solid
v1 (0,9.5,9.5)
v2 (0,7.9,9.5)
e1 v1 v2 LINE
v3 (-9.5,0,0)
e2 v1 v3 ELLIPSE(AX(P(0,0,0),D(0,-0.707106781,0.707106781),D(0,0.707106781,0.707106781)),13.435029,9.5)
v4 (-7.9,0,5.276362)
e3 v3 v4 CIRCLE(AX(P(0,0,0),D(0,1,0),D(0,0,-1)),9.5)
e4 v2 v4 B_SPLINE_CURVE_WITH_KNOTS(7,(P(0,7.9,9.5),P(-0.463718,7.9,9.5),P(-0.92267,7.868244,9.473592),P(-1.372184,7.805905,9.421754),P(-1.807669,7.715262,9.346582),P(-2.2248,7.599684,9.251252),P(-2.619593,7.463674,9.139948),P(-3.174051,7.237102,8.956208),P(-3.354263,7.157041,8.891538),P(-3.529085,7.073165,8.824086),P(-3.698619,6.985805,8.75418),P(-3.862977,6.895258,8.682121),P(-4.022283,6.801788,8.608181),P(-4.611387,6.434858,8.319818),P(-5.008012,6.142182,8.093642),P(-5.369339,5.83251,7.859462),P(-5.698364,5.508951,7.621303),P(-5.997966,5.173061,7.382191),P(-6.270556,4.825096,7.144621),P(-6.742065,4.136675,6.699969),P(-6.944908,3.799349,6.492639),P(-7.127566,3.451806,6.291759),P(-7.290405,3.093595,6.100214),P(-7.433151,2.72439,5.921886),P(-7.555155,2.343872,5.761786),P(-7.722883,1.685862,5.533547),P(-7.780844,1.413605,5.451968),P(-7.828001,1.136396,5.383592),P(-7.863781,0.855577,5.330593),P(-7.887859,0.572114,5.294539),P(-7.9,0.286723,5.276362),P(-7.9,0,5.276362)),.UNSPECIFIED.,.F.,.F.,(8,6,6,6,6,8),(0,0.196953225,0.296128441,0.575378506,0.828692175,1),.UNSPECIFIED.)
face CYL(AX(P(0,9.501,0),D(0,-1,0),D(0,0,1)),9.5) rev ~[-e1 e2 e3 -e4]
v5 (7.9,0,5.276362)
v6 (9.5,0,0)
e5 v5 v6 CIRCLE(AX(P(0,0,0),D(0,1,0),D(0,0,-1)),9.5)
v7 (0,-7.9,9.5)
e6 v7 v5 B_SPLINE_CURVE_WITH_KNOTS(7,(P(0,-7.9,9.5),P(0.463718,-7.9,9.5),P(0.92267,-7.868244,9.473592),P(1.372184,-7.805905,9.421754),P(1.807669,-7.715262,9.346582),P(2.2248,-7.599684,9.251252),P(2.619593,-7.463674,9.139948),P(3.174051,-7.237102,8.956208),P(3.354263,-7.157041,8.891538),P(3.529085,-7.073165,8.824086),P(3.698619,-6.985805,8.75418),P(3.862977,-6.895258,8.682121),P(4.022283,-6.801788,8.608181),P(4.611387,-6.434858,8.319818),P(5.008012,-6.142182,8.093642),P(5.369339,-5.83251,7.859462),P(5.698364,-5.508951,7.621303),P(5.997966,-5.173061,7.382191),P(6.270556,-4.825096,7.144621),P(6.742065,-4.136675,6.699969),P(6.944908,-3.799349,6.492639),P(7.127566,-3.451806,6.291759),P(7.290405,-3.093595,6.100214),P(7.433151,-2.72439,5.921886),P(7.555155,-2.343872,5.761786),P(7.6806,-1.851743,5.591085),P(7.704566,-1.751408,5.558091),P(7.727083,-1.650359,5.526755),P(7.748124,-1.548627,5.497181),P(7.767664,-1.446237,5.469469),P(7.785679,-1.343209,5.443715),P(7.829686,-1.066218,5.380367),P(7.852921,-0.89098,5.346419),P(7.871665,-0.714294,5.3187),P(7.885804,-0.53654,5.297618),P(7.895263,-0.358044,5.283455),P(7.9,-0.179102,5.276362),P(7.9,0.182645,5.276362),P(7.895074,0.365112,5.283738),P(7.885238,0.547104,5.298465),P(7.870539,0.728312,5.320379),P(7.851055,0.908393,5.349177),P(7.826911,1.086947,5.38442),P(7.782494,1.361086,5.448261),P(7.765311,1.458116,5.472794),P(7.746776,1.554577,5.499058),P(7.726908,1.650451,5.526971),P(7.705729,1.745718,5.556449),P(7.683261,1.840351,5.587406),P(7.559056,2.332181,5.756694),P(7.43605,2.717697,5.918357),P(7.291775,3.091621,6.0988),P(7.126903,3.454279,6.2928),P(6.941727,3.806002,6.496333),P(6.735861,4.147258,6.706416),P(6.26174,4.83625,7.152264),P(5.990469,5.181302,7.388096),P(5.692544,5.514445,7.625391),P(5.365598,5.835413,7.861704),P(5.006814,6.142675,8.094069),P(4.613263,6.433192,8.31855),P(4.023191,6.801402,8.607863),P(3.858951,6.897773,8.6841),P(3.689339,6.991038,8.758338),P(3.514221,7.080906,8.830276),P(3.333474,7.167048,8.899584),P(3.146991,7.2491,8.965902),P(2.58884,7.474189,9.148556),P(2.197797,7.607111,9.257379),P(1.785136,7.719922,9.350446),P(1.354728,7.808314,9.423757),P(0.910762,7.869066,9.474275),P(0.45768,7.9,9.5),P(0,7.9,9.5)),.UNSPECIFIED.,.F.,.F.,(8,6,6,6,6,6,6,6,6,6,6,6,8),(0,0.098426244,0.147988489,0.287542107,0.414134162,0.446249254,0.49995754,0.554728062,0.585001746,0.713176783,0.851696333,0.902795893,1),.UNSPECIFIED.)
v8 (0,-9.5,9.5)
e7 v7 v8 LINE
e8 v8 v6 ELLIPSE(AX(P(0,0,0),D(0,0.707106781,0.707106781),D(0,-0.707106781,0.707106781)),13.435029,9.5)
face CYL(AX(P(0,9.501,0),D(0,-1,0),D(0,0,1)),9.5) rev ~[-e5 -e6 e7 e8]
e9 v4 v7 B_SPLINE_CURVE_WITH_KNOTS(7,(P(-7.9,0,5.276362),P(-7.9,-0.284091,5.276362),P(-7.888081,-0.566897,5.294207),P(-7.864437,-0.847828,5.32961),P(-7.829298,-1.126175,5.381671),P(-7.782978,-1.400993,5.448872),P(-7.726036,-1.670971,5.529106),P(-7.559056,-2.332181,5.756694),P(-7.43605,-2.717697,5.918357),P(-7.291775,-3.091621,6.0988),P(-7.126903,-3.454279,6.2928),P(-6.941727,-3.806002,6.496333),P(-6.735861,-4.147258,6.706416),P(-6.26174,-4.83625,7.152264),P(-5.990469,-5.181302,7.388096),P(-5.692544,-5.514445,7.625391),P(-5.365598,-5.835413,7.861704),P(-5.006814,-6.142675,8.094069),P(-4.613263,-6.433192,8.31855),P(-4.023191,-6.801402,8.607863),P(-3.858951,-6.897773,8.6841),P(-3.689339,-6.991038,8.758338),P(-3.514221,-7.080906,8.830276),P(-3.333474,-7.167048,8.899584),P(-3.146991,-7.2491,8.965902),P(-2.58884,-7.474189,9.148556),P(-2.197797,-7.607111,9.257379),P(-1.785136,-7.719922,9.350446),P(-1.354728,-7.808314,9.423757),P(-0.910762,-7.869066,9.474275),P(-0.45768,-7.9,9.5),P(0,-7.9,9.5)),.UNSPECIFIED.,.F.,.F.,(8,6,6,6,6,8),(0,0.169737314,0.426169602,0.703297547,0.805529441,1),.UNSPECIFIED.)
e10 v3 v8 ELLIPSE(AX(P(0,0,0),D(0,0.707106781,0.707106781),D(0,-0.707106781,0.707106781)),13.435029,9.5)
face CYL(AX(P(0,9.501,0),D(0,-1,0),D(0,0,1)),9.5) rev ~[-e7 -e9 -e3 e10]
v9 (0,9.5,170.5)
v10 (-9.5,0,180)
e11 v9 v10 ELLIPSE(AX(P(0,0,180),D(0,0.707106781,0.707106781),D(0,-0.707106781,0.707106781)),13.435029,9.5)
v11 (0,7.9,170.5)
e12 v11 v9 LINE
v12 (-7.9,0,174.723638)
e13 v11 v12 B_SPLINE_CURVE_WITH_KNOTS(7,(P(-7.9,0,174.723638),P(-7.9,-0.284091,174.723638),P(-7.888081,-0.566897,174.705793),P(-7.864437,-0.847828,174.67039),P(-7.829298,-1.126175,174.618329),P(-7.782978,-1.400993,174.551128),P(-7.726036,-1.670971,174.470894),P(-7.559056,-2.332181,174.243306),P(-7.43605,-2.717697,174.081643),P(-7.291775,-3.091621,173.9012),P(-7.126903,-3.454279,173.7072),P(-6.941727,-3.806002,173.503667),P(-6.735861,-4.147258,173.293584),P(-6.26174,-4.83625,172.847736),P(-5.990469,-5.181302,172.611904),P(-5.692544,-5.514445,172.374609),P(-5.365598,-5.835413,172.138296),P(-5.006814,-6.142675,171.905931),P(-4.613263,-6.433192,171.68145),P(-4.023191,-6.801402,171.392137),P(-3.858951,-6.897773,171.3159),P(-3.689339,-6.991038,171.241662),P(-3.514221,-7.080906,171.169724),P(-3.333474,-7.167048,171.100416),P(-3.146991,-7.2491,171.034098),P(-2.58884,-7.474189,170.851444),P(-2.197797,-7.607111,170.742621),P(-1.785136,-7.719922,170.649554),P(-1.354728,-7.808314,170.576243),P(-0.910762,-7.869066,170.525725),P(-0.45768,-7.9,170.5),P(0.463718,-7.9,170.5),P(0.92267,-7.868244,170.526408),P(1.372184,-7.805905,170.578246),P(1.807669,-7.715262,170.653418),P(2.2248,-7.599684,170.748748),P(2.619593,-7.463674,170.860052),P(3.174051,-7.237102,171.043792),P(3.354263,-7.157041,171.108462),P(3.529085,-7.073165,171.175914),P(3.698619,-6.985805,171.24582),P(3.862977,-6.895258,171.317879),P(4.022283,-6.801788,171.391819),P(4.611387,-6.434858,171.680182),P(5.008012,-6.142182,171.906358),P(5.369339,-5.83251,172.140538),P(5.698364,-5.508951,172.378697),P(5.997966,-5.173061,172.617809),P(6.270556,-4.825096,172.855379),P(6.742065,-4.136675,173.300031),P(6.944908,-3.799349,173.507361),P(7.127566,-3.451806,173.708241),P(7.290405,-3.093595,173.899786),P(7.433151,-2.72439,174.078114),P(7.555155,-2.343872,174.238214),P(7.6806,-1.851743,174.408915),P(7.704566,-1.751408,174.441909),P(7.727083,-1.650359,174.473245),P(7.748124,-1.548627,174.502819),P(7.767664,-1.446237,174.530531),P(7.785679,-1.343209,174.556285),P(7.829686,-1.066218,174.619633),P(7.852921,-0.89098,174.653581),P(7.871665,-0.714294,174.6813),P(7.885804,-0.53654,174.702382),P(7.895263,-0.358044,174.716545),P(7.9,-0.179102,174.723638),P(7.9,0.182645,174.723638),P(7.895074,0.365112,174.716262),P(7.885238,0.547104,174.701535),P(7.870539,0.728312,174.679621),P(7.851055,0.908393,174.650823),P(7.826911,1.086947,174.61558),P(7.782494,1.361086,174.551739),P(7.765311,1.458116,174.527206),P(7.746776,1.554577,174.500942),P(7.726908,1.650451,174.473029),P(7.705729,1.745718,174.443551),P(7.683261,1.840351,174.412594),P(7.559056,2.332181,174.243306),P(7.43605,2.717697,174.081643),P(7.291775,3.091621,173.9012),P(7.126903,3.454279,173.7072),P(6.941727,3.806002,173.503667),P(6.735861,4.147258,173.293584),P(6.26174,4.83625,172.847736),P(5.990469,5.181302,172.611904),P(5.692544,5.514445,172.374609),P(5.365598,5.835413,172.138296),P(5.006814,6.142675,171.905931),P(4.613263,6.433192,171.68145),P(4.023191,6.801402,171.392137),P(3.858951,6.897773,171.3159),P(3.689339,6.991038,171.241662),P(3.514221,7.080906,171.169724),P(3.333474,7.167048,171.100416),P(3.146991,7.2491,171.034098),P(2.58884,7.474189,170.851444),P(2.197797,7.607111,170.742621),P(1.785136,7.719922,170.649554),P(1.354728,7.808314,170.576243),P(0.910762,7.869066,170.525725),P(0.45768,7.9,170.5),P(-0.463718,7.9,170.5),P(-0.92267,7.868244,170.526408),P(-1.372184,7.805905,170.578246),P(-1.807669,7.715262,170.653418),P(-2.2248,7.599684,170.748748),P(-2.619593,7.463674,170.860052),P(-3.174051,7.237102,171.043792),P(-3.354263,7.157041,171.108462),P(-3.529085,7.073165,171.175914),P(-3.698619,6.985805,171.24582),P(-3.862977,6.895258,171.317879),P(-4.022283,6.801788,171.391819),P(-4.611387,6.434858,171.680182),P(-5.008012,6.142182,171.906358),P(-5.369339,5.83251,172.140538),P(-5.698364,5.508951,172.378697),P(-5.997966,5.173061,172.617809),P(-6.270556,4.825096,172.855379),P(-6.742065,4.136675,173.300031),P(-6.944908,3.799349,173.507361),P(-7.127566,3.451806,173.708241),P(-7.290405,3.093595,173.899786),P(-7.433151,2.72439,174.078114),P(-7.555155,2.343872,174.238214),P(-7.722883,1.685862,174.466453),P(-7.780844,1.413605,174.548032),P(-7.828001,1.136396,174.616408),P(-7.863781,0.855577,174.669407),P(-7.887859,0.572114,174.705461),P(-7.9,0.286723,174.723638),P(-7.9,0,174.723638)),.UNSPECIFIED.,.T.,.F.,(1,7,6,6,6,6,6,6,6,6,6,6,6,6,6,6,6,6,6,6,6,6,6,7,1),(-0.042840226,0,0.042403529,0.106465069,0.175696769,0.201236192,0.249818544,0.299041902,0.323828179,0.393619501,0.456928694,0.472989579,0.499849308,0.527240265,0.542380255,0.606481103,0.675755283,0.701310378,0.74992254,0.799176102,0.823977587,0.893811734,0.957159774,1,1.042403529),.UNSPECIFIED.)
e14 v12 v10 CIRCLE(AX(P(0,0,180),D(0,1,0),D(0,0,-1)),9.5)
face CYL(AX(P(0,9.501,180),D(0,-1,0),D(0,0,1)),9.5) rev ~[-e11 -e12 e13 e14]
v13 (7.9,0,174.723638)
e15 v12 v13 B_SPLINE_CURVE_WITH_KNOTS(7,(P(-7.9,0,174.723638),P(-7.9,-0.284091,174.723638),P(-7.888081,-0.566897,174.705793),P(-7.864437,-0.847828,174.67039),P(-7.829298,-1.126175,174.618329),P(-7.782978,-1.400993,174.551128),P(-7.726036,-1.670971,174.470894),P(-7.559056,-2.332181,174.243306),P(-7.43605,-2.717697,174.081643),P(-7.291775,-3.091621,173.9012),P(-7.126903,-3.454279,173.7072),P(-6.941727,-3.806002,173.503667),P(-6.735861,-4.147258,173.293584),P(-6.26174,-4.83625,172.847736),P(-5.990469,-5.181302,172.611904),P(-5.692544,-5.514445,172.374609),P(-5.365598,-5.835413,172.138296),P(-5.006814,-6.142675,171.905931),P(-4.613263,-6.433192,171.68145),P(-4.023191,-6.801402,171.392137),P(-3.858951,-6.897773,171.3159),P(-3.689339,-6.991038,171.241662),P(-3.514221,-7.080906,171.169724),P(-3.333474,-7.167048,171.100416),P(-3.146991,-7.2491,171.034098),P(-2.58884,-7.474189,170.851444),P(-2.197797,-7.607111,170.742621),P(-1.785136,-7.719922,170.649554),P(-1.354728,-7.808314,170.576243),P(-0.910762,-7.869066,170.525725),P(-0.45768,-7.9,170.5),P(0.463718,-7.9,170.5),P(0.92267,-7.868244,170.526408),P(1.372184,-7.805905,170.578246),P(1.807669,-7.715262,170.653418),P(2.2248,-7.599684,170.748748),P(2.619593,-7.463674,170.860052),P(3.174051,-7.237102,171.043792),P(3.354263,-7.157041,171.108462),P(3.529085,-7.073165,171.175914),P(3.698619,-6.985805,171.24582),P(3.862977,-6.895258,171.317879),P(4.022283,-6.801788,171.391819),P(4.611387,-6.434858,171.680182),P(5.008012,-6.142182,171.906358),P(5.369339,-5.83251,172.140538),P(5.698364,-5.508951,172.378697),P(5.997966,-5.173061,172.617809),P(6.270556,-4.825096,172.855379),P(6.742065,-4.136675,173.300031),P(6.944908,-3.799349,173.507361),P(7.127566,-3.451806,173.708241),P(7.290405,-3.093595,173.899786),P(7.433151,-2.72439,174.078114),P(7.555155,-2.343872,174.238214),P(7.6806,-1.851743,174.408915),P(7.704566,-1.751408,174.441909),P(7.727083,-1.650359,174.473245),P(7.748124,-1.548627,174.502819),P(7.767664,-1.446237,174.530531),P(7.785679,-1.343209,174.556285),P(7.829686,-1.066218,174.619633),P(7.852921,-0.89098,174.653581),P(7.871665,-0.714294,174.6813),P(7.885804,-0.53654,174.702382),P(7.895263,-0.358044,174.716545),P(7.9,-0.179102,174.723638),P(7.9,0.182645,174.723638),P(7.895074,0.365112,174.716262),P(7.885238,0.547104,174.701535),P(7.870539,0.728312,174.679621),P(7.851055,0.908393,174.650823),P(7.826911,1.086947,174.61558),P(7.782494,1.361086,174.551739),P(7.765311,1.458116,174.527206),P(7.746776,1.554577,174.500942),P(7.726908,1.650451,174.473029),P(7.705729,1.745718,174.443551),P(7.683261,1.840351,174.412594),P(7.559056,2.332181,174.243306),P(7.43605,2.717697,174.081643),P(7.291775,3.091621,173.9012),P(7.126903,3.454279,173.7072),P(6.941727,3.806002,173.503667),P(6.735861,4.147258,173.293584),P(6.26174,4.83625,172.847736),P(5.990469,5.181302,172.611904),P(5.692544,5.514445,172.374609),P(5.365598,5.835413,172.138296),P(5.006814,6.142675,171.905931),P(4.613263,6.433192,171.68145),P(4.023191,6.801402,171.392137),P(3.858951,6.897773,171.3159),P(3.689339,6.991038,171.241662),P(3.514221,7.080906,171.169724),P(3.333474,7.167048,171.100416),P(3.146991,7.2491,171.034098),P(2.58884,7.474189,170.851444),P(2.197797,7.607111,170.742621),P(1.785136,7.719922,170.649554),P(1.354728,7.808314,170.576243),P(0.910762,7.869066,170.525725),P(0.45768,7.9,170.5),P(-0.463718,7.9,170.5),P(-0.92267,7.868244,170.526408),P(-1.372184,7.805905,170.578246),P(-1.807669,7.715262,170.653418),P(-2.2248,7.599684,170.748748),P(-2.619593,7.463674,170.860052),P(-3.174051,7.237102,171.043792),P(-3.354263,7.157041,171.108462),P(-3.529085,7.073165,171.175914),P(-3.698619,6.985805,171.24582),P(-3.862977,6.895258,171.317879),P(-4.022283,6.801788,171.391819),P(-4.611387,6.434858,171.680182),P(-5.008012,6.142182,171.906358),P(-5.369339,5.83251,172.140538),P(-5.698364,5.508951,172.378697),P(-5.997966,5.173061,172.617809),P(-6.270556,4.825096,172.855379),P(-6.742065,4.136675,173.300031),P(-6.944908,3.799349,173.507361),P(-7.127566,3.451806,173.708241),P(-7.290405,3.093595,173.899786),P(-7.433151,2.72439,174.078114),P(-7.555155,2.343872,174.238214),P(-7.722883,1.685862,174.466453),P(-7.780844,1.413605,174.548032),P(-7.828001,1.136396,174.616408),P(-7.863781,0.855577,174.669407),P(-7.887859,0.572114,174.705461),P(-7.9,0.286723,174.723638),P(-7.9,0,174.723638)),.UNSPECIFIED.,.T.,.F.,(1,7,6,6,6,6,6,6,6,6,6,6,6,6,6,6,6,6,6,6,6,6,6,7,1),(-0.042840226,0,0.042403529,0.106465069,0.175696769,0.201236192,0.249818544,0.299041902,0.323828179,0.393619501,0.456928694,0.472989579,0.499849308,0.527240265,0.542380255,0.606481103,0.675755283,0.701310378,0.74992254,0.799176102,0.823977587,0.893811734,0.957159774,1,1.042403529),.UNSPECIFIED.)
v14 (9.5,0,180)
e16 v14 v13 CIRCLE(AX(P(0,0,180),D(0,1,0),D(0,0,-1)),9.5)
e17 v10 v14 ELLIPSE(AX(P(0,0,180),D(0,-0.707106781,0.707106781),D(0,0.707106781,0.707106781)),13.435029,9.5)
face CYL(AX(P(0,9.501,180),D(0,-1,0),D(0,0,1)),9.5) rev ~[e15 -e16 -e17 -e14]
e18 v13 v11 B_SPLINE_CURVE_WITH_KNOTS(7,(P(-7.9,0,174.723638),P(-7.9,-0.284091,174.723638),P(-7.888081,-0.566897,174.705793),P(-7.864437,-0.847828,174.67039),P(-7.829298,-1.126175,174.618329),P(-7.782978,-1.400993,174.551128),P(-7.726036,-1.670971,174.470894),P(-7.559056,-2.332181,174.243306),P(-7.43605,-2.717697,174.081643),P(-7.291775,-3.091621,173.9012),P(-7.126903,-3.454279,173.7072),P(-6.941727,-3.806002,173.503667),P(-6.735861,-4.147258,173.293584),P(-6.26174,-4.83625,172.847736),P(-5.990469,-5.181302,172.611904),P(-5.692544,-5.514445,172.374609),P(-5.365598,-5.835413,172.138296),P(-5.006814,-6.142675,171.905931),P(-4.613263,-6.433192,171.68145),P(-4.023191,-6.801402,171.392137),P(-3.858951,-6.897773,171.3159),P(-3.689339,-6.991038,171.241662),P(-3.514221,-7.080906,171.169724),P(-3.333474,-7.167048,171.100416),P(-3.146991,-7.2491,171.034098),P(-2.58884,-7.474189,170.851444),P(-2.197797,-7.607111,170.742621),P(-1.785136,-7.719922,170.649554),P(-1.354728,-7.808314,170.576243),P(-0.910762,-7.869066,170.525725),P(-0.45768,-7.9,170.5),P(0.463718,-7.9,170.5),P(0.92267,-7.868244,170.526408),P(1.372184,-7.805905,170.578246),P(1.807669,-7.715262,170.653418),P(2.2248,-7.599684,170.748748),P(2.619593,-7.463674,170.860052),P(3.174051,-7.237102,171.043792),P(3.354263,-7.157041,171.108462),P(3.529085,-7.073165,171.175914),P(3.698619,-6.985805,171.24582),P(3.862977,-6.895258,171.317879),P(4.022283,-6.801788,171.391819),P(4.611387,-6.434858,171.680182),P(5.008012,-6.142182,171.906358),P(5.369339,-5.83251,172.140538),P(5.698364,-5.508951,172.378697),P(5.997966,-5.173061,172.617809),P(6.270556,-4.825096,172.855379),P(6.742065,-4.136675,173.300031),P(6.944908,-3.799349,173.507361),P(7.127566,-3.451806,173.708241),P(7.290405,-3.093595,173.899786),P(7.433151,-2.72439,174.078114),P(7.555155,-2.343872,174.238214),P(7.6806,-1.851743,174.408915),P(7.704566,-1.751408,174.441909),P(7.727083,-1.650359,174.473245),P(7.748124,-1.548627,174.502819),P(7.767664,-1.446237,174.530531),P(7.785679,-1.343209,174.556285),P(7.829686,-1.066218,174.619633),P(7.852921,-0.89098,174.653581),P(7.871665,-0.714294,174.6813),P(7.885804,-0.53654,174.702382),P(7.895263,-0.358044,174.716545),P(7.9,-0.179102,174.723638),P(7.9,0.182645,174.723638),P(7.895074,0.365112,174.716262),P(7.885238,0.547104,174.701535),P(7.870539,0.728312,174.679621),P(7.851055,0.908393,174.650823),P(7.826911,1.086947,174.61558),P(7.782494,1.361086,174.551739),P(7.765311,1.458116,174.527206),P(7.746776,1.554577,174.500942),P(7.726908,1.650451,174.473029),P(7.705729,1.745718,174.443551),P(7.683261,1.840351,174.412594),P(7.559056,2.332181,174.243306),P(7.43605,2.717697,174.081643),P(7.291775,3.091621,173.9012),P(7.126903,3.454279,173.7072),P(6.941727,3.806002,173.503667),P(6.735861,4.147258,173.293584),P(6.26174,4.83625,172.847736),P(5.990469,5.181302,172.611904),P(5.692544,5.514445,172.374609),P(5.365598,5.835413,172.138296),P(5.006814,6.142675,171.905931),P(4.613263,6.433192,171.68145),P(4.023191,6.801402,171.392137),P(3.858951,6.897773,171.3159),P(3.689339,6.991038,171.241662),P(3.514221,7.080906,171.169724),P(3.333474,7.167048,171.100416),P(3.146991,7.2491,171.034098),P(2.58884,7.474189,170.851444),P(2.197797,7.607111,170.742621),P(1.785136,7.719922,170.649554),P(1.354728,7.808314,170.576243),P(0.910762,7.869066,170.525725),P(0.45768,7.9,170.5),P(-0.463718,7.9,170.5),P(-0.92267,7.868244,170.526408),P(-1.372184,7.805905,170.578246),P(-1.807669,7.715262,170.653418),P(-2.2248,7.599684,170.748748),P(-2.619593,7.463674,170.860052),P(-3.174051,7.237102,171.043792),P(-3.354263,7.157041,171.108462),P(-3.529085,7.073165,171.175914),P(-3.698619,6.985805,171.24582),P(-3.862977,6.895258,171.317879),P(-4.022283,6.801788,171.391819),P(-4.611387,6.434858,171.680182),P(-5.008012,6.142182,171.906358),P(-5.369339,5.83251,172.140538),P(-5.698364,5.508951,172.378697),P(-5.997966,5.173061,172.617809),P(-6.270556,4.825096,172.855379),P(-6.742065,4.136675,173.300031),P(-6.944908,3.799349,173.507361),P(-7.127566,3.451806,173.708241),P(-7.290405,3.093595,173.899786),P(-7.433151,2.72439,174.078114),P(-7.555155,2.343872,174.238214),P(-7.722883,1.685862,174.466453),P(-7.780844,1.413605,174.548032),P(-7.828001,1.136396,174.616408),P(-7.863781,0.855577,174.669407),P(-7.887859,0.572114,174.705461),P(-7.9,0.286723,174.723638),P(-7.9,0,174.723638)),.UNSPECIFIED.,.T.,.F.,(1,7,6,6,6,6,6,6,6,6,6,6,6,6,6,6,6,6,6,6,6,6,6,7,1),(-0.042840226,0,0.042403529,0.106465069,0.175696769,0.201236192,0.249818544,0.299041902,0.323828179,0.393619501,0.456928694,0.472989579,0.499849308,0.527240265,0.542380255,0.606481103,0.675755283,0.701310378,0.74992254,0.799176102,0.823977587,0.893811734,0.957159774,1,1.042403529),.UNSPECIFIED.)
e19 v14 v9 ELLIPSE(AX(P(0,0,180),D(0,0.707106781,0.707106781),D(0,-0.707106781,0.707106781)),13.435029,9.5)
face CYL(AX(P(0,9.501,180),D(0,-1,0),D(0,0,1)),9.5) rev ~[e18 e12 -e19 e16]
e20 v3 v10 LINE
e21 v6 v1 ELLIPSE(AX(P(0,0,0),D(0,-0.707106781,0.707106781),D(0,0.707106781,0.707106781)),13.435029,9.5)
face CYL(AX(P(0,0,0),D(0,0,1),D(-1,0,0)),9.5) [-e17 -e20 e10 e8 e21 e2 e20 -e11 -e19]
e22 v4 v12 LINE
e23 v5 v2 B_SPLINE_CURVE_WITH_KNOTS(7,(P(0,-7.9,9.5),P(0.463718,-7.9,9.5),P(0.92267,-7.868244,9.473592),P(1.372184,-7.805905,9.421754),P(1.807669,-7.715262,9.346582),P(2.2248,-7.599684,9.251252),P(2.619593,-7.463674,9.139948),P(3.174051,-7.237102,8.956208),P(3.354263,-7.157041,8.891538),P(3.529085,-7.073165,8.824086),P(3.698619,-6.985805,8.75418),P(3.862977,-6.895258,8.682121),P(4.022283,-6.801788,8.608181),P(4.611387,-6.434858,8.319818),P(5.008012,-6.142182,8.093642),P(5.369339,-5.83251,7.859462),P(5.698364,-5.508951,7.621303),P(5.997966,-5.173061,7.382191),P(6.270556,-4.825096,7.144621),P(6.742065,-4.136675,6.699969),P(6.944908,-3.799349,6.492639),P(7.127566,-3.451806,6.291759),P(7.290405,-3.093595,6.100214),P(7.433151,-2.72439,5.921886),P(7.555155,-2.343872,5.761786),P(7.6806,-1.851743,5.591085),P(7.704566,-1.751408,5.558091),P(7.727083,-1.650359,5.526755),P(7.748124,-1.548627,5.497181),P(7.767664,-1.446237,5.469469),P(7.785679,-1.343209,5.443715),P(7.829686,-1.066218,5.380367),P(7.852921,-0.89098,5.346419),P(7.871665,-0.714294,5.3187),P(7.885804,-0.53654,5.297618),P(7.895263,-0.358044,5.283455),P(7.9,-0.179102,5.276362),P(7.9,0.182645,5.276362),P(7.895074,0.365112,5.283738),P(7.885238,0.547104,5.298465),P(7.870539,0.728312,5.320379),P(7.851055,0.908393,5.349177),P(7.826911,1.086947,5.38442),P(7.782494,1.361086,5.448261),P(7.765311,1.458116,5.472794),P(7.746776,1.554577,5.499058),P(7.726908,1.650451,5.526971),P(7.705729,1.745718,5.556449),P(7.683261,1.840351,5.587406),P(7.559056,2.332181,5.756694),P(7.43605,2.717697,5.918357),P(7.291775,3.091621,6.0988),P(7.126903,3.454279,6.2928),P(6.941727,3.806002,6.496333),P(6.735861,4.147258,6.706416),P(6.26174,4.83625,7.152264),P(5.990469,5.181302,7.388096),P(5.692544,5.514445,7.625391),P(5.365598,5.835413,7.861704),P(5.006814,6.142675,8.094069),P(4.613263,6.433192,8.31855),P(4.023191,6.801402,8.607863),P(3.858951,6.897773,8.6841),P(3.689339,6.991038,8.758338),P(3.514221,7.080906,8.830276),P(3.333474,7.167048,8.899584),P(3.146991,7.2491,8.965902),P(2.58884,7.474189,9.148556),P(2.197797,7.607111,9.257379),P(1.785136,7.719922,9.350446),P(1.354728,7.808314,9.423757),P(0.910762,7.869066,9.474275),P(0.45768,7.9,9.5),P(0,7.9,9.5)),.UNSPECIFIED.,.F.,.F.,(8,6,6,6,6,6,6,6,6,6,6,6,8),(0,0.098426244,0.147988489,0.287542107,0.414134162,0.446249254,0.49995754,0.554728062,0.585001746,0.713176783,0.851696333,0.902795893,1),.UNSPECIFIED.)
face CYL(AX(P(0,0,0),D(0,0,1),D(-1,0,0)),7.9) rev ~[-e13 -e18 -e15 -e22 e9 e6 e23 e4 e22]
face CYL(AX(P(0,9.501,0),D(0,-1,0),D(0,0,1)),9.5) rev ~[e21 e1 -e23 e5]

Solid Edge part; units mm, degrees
sketch "Sketch1" plane through (0, 0, 0) normal (0, -1, 0) x (1, 0, 0)
  line L0 (0, 0) -> (0, 180)
  dimension "D1" = 180
sketch "Sketch2" plane through (0, 0, 0) normal (0, 0, -1) x (-1, 0, 0)
  circle A0 centre (0, 0) radius 9.5
  dimension "D1" = 19
sweep "SweptProtrusion_1" add profiles "Sketch2" path "Sketch1"
shell "Thinwall_1" thickness 1.6 removed faces 2 at (6.5233, -6.1433, 0) at (6.5233, -6.1433, 180)
hole "Hole_1" at (0, 0, 0) direction (0, -1, 0) diameter 19 end through all both ways yes
hole "Hole1" at (0, 0, 180) direction (0, -1, 0) diameter 19 end through all both ways yes
properties material "Aluminum, 1060"
